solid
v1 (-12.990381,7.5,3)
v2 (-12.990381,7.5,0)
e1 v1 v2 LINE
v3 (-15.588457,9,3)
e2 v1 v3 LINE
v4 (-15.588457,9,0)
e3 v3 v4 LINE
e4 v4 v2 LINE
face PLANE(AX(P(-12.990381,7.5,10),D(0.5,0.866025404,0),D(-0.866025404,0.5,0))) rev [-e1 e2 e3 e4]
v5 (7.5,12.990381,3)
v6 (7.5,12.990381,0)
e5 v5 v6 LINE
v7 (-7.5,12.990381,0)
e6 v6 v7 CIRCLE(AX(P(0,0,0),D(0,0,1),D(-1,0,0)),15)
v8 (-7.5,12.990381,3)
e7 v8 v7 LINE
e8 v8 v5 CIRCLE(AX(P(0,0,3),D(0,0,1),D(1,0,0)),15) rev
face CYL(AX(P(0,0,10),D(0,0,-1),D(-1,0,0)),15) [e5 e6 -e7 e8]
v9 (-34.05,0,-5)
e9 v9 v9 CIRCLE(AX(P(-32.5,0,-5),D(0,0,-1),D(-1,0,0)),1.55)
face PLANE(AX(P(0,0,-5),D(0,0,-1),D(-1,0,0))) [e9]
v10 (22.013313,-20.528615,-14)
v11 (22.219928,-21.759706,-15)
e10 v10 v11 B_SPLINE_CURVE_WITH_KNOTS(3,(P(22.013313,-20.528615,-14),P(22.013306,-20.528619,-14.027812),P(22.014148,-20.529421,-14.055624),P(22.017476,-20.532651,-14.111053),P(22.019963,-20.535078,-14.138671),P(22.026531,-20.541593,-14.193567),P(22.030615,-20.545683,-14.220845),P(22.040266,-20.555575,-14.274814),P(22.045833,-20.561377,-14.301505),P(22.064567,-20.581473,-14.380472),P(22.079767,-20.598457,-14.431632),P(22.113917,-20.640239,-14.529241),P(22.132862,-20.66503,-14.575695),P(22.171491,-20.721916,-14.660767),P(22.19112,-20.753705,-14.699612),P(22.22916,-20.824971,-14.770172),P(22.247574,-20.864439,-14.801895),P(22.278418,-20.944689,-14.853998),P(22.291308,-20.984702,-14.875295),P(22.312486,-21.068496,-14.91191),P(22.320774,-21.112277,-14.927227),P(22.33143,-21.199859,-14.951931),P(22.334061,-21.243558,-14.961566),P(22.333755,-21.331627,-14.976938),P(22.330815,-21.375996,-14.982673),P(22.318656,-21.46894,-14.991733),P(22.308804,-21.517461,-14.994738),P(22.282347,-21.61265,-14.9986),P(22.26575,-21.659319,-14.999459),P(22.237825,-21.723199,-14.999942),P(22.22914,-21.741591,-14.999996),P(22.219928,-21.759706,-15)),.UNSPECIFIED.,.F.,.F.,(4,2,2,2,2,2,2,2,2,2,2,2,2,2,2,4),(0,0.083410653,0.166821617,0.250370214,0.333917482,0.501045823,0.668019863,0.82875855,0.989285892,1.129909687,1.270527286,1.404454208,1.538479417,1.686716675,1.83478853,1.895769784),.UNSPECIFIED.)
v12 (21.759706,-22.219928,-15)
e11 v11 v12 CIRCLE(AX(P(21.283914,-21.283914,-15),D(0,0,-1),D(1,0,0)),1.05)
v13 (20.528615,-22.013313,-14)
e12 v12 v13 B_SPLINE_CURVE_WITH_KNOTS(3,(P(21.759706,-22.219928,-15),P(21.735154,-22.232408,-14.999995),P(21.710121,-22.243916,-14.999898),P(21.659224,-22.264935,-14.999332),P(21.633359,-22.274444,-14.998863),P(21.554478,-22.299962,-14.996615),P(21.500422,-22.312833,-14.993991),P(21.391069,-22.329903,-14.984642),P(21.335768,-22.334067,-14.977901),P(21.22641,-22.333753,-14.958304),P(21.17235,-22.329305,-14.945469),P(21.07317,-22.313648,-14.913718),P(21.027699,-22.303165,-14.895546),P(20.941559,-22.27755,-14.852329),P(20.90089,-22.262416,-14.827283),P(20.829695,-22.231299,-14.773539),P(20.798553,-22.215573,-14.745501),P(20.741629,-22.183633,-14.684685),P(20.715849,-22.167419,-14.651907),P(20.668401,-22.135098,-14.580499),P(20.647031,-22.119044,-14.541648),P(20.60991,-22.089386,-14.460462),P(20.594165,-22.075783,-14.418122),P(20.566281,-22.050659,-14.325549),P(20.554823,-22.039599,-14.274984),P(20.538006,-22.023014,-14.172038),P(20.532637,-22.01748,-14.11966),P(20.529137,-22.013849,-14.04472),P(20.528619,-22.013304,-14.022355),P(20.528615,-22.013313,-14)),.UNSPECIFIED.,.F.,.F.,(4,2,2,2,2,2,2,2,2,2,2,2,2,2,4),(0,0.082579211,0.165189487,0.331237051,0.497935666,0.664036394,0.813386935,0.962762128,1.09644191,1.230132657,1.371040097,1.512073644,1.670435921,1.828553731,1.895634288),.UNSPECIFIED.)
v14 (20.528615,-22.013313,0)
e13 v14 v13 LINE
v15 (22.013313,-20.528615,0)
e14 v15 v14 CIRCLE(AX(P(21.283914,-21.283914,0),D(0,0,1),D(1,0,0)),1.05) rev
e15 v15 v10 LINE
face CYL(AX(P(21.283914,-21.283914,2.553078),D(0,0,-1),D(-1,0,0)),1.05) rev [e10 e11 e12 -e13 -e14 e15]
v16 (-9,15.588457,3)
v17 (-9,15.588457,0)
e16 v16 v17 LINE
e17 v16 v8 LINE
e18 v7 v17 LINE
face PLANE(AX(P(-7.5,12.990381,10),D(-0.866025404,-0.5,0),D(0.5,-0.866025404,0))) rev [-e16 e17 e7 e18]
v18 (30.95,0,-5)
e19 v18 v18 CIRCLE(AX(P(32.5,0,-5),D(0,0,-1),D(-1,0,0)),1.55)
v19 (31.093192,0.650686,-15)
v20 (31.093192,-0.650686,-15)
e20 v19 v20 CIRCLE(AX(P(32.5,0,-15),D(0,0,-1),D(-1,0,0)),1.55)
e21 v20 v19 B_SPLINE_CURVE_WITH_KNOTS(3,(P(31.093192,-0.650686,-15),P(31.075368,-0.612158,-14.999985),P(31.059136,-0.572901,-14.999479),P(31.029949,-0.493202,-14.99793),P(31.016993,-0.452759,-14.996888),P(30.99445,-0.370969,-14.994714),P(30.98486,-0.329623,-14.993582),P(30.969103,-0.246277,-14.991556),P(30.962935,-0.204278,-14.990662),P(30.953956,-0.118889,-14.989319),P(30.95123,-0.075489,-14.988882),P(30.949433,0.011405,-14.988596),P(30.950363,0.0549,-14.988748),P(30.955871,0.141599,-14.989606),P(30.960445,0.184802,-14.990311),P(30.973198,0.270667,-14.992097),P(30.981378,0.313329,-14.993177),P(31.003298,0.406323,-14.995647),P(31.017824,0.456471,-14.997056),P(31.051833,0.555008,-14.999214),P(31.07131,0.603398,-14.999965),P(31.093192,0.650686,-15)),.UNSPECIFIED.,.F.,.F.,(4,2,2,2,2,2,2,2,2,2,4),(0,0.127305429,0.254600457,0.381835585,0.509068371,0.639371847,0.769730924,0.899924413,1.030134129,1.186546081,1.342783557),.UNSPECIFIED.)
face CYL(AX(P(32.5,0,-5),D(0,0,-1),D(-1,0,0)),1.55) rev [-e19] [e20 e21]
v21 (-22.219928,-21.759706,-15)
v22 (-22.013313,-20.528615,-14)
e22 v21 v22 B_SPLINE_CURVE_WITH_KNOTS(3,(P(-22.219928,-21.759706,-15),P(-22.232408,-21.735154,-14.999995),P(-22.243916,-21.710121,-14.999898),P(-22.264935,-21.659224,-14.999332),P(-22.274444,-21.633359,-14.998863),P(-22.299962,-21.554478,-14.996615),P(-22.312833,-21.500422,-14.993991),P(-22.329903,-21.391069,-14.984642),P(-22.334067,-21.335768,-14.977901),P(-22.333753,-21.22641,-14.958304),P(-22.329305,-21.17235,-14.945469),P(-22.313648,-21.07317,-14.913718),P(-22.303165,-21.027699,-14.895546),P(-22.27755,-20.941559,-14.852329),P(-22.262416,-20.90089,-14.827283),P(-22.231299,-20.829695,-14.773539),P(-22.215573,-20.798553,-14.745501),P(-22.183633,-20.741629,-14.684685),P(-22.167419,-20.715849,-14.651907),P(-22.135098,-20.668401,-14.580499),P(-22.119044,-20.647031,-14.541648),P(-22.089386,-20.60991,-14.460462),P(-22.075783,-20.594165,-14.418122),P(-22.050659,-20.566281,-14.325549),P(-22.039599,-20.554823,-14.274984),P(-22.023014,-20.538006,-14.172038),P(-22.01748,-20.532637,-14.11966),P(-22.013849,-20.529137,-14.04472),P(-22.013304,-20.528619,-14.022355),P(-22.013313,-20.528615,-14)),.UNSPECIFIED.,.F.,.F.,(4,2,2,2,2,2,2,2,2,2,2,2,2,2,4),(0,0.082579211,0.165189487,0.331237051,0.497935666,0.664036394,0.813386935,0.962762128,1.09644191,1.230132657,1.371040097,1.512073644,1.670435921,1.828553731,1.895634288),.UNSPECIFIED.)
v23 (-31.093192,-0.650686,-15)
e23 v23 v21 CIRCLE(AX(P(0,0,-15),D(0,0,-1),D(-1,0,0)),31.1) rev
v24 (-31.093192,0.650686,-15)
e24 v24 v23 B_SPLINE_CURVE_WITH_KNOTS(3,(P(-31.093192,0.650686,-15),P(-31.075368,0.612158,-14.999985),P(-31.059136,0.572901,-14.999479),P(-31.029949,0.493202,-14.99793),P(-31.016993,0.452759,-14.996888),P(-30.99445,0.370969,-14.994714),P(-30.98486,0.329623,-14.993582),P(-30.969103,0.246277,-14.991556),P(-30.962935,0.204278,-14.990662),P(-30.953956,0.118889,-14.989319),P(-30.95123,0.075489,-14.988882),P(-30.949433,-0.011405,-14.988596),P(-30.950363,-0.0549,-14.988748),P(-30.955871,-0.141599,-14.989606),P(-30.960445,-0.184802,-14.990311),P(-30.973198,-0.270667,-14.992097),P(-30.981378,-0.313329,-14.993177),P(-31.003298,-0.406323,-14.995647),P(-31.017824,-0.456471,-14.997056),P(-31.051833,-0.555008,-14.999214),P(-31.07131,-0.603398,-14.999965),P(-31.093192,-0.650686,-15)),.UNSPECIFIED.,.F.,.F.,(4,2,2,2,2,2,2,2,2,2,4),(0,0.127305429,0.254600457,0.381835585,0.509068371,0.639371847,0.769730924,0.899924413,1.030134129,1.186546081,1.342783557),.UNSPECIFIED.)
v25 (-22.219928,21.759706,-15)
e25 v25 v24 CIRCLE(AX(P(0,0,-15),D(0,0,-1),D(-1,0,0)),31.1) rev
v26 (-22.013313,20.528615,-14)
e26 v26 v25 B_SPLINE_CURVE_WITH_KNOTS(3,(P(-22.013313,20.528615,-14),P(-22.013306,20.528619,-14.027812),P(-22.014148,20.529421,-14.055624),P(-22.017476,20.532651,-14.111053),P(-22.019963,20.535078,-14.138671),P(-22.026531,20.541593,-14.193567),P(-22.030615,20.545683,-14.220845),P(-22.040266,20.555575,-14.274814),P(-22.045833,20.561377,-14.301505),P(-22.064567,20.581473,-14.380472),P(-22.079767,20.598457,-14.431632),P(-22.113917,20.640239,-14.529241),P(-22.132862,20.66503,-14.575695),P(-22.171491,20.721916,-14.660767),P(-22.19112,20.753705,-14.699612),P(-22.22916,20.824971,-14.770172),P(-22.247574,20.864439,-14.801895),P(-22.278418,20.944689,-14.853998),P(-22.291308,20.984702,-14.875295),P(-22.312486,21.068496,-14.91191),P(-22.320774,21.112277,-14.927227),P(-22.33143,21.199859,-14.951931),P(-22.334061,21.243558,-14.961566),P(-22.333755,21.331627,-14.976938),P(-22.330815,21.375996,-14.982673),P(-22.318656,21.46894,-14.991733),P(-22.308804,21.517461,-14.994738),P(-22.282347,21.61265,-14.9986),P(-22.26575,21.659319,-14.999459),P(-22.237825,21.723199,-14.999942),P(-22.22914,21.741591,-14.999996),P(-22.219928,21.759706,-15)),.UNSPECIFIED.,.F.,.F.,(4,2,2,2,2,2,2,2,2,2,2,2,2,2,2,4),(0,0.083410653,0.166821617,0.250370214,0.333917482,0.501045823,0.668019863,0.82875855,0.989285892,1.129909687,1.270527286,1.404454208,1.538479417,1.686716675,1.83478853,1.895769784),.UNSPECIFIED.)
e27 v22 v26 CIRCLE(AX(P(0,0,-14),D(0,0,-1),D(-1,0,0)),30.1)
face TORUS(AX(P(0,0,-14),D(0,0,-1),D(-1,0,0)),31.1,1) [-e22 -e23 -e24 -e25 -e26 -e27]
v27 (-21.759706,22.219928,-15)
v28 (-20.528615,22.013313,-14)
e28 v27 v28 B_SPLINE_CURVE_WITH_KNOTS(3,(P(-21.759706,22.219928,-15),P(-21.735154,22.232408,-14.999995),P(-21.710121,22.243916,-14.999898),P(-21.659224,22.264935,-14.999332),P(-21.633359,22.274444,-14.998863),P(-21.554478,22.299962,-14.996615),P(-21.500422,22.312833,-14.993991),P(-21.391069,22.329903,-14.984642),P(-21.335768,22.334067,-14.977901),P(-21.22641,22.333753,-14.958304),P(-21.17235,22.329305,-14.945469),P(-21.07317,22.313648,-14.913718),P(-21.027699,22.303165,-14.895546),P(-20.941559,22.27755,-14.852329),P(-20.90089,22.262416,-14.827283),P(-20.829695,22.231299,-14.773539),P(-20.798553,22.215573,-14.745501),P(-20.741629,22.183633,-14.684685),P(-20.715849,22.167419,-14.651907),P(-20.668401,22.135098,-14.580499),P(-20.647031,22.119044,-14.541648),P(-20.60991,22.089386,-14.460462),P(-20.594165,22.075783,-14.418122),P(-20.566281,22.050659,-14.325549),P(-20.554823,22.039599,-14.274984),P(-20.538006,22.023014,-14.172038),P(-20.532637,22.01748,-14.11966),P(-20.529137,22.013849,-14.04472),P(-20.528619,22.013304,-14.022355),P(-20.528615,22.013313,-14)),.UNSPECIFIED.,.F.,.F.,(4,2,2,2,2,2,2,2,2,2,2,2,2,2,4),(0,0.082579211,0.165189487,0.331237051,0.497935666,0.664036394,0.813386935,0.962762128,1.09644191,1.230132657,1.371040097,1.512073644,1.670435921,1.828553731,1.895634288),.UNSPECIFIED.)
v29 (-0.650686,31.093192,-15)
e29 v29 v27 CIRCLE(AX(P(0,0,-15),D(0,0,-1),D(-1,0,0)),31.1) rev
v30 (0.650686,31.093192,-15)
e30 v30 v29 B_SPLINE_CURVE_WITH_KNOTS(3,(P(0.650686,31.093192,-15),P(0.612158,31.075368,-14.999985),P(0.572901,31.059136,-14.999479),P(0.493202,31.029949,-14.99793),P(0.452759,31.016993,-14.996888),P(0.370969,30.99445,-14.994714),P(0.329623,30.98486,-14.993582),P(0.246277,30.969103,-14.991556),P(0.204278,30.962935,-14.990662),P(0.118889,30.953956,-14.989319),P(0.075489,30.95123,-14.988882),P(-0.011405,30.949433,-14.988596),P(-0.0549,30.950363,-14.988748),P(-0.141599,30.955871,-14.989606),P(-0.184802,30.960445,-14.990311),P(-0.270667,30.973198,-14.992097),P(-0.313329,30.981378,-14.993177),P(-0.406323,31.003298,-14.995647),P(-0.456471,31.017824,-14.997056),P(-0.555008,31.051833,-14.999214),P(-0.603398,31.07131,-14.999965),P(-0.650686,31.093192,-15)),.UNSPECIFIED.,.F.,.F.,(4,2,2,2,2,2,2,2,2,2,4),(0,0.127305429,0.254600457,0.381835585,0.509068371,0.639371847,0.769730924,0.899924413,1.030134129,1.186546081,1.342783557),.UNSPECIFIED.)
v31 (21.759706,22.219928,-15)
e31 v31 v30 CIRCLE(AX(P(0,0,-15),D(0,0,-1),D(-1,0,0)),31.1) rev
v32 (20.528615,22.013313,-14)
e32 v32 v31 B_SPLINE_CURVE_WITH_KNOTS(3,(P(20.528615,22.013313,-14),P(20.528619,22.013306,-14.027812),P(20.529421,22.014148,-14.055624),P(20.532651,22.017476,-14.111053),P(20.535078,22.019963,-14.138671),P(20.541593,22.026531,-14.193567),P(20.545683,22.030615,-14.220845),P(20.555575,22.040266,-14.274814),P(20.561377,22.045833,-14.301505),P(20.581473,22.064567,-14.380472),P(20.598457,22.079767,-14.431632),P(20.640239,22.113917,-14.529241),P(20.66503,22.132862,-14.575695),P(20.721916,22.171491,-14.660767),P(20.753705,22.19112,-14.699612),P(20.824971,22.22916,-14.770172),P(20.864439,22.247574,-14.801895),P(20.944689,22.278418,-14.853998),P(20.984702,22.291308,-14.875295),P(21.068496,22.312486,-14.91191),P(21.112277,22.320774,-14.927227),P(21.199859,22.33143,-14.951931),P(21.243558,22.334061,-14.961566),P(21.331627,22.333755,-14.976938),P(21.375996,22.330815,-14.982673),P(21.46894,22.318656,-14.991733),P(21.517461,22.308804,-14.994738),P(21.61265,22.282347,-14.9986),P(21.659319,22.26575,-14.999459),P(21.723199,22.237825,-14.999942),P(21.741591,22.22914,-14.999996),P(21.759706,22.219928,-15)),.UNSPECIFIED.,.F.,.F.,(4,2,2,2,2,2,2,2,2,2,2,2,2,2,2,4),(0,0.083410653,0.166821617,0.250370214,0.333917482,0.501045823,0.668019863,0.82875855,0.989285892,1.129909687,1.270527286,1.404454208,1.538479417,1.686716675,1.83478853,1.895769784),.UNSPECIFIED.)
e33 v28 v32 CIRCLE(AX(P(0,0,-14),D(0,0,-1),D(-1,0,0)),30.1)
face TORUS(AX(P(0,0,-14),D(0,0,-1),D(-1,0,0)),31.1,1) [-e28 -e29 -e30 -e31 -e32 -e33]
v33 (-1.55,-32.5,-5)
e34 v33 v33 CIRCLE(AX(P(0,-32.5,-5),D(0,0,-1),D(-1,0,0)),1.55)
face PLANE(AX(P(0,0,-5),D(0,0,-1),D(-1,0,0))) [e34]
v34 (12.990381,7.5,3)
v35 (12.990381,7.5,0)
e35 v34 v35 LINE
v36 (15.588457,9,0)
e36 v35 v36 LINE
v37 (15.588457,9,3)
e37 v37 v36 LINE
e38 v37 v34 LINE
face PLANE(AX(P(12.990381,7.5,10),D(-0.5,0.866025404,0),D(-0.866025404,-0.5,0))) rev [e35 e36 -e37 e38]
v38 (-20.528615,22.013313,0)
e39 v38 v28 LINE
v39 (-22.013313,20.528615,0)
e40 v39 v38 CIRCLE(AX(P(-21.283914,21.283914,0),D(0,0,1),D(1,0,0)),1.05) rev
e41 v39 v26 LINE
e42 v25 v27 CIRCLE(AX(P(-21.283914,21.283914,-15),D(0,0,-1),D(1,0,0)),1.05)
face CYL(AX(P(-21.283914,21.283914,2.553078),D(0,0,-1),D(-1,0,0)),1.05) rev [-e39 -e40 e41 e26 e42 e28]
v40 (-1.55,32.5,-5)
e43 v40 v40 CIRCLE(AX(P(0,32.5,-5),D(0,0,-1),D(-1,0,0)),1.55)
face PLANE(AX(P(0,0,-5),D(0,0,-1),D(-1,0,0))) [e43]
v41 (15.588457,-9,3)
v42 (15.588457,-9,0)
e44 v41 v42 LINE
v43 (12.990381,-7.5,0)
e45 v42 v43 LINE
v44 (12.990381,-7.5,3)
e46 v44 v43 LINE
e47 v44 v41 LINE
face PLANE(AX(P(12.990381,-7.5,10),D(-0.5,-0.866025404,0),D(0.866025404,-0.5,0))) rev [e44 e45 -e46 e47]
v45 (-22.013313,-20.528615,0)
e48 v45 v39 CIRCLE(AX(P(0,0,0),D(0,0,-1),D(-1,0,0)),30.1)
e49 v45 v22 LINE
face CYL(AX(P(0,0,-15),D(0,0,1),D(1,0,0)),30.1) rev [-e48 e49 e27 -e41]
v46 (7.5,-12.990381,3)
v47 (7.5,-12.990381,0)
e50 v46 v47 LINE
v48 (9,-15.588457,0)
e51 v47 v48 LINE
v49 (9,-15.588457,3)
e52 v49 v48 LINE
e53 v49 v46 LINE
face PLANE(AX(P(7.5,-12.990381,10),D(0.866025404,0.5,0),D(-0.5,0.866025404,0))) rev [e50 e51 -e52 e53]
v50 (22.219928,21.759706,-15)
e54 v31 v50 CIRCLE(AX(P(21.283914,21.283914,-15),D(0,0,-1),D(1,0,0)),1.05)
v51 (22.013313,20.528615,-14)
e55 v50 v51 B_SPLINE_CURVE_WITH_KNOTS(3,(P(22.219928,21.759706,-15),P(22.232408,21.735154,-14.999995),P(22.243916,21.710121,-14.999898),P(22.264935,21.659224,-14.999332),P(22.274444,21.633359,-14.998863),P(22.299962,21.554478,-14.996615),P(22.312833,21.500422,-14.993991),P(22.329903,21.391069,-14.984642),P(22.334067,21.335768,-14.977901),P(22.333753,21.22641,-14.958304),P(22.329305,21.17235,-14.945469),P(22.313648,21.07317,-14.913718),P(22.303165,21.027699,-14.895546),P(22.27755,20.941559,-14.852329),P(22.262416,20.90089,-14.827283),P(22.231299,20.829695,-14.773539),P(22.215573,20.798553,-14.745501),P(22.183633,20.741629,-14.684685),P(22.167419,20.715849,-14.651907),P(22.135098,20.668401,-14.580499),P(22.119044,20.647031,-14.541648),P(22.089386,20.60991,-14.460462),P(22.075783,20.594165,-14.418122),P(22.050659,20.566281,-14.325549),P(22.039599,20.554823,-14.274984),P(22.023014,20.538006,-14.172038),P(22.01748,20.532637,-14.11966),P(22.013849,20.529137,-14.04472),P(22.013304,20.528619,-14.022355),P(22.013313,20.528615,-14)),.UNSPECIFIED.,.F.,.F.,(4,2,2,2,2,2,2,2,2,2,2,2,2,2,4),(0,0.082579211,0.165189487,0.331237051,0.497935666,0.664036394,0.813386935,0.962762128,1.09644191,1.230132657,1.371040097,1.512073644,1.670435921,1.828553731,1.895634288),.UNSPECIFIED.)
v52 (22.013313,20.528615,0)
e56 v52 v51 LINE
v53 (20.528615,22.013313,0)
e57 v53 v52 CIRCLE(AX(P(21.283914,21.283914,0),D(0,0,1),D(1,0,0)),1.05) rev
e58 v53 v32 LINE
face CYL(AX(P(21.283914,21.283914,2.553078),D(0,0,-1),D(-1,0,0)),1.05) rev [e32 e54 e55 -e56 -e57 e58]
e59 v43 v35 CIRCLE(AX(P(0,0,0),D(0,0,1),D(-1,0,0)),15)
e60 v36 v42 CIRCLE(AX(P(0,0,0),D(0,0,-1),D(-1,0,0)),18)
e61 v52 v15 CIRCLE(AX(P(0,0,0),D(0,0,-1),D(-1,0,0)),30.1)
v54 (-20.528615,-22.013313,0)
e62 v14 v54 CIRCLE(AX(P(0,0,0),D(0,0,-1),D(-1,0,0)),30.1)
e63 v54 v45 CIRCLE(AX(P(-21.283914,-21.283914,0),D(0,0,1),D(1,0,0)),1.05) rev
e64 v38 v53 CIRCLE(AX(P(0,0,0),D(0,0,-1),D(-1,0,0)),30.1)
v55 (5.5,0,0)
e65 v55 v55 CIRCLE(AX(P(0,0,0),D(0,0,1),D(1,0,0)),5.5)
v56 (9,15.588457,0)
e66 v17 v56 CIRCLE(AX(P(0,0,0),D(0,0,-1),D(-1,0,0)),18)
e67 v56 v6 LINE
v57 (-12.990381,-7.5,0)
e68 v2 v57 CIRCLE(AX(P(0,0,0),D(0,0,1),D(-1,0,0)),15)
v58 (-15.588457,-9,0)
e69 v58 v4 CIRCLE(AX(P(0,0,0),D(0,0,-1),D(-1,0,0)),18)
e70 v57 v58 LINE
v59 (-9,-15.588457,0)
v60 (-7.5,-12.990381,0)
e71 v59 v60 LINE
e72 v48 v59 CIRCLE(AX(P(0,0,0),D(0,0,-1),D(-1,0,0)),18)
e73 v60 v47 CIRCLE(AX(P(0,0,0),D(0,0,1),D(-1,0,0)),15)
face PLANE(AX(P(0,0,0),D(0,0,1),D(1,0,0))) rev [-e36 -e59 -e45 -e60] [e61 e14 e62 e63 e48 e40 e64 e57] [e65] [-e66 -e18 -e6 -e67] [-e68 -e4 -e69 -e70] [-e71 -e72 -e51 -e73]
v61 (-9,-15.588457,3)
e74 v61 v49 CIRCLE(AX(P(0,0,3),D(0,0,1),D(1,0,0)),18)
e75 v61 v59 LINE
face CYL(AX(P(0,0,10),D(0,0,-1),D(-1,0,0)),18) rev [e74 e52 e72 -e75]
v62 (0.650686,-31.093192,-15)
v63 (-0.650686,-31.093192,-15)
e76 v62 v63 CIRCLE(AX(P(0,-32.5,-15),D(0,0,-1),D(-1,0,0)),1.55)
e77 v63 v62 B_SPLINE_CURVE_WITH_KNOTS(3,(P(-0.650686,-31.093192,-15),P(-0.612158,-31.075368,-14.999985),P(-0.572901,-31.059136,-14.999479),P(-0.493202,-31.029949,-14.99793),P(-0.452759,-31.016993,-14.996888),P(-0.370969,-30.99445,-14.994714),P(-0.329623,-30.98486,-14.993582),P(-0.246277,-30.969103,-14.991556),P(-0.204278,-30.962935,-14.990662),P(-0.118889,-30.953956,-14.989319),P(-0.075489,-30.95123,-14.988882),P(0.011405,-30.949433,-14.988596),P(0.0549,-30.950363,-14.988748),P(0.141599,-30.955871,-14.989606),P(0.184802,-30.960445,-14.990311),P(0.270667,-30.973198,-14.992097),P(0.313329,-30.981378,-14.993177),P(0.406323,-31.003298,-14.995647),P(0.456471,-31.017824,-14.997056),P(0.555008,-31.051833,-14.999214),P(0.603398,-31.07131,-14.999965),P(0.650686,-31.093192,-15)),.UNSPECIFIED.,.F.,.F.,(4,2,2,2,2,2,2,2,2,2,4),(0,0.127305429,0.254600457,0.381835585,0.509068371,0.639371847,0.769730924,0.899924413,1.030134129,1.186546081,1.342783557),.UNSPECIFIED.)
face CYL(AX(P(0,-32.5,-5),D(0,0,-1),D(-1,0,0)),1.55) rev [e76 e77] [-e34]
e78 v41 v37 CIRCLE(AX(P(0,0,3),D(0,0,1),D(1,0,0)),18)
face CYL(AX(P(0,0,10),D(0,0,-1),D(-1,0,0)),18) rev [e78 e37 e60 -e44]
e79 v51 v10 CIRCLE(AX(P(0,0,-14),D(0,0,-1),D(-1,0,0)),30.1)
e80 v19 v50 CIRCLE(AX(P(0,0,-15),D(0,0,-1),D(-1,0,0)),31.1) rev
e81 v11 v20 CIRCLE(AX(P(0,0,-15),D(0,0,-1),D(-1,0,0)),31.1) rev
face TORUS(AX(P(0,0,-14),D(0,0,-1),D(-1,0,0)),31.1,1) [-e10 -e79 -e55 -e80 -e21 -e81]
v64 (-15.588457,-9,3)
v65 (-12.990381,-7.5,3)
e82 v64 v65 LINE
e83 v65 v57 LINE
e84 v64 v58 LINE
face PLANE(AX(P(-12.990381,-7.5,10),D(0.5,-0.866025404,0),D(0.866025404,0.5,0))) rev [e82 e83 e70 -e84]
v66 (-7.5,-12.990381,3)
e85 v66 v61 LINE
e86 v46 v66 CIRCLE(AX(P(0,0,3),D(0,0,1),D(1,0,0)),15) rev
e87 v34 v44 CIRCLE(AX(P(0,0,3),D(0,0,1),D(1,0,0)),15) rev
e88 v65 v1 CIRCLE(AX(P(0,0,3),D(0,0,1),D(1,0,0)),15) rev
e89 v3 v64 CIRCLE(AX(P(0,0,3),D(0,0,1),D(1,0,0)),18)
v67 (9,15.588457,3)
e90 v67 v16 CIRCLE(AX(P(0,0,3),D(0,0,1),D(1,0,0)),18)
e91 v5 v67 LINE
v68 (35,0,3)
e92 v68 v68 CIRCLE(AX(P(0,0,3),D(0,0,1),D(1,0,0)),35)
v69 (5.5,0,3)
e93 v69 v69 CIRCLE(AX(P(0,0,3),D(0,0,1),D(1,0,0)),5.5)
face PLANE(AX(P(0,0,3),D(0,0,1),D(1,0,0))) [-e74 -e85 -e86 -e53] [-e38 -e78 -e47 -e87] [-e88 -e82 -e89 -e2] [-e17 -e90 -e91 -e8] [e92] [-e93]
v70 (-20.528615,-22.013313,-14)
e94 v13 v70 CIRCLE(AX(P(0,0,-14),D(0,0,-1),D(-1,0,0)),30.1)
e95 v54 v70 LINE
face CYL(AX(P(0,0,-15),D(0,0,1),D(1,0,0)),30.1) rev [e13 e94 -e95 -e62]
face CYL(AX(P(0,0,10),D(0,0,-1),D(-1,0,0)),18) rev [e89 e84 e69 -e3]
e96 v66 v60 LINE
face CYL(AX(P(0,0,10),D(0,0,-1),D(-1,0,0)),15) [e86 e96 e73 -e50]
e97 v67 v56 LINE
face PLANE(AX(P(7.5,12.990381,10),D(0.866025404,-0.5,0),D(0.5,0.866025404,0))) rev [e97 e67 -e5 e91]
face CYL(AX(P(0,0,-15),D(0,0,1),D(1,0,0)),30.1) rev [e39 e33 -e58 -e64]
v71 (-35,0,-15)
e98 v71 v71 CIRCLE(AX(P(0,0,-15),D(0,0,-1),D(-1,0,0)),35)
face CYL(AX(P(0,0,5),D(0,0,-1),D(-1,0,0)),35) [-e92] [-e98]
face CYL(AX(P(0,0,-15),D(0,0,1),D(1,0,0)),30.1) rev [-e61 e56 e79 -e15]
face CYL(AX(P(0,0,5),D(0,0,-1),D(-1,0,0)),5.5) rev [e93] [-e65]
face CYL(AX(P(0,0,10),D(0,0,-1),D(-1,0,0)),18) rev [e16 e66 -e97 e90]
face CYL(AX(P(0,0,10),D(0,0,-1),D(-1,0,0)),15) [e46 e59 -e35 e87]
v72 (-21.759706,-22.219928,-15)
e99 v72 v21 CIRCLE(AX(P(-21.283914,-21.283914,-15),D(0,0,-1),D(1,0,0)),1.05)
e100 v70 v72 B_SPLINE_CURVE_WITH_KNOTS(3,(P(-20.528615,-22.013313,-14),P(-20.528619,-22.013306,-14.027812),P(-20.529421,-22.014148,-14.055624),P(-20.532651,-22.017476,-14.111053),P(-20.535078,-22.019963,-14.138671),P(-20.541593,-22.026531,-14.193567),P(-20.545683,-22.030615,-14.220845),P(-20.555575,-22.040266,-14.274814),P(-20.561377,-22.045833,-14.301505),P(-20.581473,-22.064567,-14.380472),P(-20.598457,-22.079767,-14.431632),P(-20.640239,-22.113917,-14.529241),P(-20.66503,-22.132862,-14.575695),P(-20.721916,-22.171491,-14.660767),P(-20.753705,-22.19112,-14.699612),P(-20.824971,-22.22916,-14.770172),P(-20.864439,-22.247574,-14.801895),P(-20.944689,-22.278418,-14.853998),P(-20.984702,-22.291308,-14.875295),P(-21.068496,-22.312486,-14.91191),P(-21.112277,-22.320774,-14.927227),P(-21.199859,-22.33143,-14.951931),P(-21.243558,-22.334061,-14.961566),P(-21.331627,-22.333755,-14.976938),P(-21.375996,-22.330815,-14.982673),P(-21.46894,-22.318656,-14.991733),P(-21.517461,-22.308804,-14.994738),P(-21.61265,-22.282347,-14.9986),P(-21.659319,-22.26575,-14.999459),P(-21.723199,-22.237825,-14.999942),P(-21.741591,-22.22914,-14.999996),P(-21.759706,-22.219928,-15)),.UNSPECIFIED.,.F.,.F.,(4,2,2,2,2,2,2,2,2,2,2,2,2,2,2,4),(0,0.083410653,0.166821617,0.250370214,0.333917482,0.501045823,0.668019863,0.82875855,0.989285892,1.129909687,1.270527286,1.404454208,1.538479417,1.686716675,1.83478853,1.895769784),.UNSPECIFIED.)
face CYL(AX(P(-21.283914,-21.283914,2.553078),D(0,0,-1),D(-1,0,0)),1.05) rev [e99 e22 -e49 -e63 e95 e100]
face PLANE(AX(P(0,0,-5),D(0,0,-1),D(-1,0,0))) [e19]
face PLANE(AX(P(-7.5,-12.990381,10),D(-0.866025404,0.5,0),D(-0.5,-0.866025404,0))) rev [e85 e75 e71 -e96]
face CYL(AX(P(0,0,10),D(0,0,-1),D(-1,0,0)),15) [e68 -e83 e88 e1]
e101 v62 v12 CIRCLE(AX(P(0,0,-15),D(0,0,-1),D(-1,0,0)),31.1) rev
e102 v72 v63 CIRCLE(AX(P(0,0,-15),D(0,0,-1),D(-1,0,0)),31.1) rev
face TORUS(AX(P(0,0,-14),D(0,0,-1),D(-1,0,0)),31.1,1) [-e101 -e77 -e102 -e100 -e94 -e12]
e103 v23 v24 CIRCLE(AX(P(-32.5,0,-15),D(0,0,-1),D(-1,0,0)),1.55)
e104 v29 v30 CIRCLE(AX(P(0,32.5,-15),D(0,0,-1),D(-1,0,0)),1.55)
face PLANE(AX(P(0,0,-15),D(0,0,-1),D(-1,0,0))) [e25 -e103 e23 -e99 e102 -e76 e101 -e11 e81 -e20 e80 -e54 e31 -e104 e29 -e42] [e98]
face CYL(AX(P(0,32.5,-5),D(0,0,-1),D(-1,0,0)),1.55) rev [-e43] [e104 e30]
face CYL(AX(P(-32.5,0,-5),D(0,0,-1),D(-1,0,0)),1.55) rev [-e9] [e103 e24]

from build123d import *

# Parameters (mm, degrees)
SKETCH_2_R          = 35
SKETCH_2_R_2        = 5.5
EXTRUDE_1_DEPTH     = 5
EXTRUDE_START       = 15
SKETCH_3_R          = 35
SKETCH_3_R_2        = 30.1
EXTRUDE_2_DEPTH     = 15
SKETCH_4_R          = 1.55
CUT_EXTRUDE_1_DEPTH = 10
CUT_EXTRUDE_5_DEPTH = 15
FILLET_1_R          = 1
CUT_EXTRUDE_START   = -2
SKETCH_10_R         = 35
CUT_EXTRUDE_6_DEPTH = 2
CUT_EXTRUDE_7_DEPTH = 10


with BuildPart() as part:
    # 草图2 → 凸台-拉伸1 (new body)
    with BuildSketch(Plane.XY):
        Circle(SKETCH_2_R)
        Circle(SKETCH_2_R_2, mode=Mode.SUBTRACT)
    extrude(amount=EXTRUDE_1_DEPTH)

    # 草图3 → 凸台-拉伸2 (add)
    with BuildSketch(Plane(origin=(0, 0, 0), x_dir=(-1, 0, 0), z_dir=(0, 0, -1)).offset(EXTRUDE_START)):
        Circle(SKETCH_3_R)
        Circle(SKETCH_3_R_2, mode=Mode.SUBTRACT)
    extrude(amount=-EXTRUDE_2_DEPTH)

    # 草图4 → 切除-拉伸1 (cut)
    with BuildSketch(Plane(origin=(0, 0, -15), x_dir=(-1, 0, 0), z_dir=(0, 0, -1))):
        with Locations((0, 32.5)):
            Circle(SKETCH_4_R)
        with Locations((32.5, 0)):
            Circle(SKETCH_4_R)
        with Locations((0, -32.5)):
            Circle(SKETCH_4_R)
        with Locations((-32.5, 0)):
            Circle(SKETCH_4_R)
    extrude(amount=-CUT_EXTRUDE_1_DEPTH, mode=Mode.SUBTRACT)

    # 草图9 → 切除-拉伸5 (cut)
    with BuildSketch(Plane(origin=(0, 0, -15), x_dir=(-1, 0, 0), z_dir=(0, 0, -1))):
        with BuildLine():
            ThreePointArc((-22.013313369, 20.528615017), (-22.026376234, 22.026376234), (-20.528615017, 22.013313369))
            ThreePointArc((-20.528615017, 22.013313369), (-21.283914114, 21.283914114), (-22.013313369, 20.528615017))
        make_face()
        with BuildLine():
            ThreePointArc((20.528615017, 22.013313369), (22.026376234, 22.026376234), (22.013313369, 20.528615017))
            ThreePointArc((22.013313369, 20.528615017), (21.283914114, 21.283914114), (20.528615017, 22.013313369))
        make_face()
        with BuildLine():
            ThreePointArc((22.013313369, -20.528615017), (22.026376234, -22.026376234), (20.528615017, -22.013313369))
            ThreePointArc((20.528615017, -22.013313369), (21.283914114, -21.283914114), (22.013313369, -20.528615017))
        make_face()
        with BuildLine():
            ThreePointArc((-20.528615017, -22.013313369), (-22.026376234, -22.026376234), (-22.013313369, -20.528615017))
            ThreePointArc((-22.013313369, -20.528615017), (-21.283914114, -21.283914114), (-20.528615017, -22.013313369))
        make_face()
    extrude(amount=-CUT_EXTRUDE_5_DEPTH, mode=Mode.SUBTRACT)

    # 圆角1
    # the kernel refuses this fillet: 1 mm, written as the material it takes off along each edge
    with BuildSketch(Plane(origin=(0, 0, -15), x_dir=(-0.7403558797037455, 0.6722151228498904, 0), z_dir=(-0.6722151228498904, -0.7403558797037455, 0))) as fillet_1_piece_1:
        with BuildLine():
            CenterArc((30.1 + FILLET_1_R, -FILLET_1_R), FILLET_1_R, 90, 90)
            Line((30.1, -FILLET_1_R), (30.1, 0))
            Line((30.1, 0), (30.1 + FILLET_1_R, 0))
        make_face()
    revolve(axis=Axis((0, 0, -15), (0, 0, -1)), revolution_arc=95.523479776, mode=Mode.SUBTRACT)
    with BuildSketch(Plane(origin=(0, 0, -15), x_dir=(0.6722151228498918, 0.7403558797037441, 0), z_dir=(-0.7403558797037441, 0.6722151228498918, 0))) as fillet_1_piece_2:
        with BuildLine():
            CenterArc((30.1 + FILLET_1_R, -FILLET_1_R), FILLET_1_R, 90, 90)
            Line((30.1, -FILLET_1_R), (30.1, 0))
            Line((30.1, 0), (30.1 + FILLET_1_R, 0))
        make_face()
    revolve(axis=Axis((0, 0, -15), (0, 0, -1)), revolution_arc=95.523479776, mode=Mode.SUBTRACT)
    with BuildSketch(Plane(origin=(0, 0, -15), x_dir=(0.7403558797037453, -0.6722151228498905, 0), z_dir=(0.6722151228498905, 0.7403558797037453, 0))) as fillet_1_piece_3:
        with BuildLine():
            CenterArc((30.1 + FILLET_1_R, -FILLET_1_R), FILLET_1_R, 90, 90)
            Line((30.1, -FILLET_1_R), (30.1, 0))
            Line((30.1, 0), (30.1 + FILLET_1_R, 0))
        make_face()
    revolve(axis=Axis((0, 0, -15), (0, 0, -1)), revolution_arc=95.523479776, mode=Mode.SUBTRACT)
    with BuildSketch(Plane(origin=(0, 0, -15), x_dir=(-1, 0, 0), z_dir=(0, -1, 0))) as fillet_1_piece_4:
        with BuildLine():
            CenterArc((30.1 + FILLET_1_R, -FILLET_1_R), FILLET_1_R, 90, 90)
            Line((30.1, -FILLET_1_R), (30.1, 0))
            Line((30.1, 0), (30.1 + FILLET_1_R, 0))
        make_face()
    revolve(axis=Axis((0, 0, -15), (0, 0, -1)), revolution_arc=47.760430641, mode=Mode.SUBTRACT)
    with BuildSketch(Plane(origin=(0, 0, -15), x_dir=(-0.6722320403041436, -0.7403405189428228, 0), z_dir=(0.7403405189428228, -0.6722320403041436, 0))) as fillet_1_piece_5:
        with BuildLine():
            CenterArc((30.1 + FILLET_1_R, -FILLET_1_R), FILLET_1_R, 90, 90)
            Line((30.1, -FILLET_1_R), (30.1, 0))
            Line((30.1, 0), (30.1 + FILLET_1_R, 0))
        make_face()
    revolve(axis=Axis((0, 0, -15), (0, 0, -1)), revolution_arc=47.760430641, mode=Mode.SUBTRACT)

    # 草图10 → 切除-拉伸6 (cut)
    with BuildSketch(Plane.XY.offset(5).offset(CUT_EXTRUDE_START)):
        with Locations(Location((0, 0, 0), (0, 0, 180))):
            Circle(SKETCH_10_R)
    extrude(amount=CUT_EXTRUDE_6_DEPTH, mode=Mode.SUBTRACT)

    # 草图11 → 切除-拉伸7 (cut)
    with BuildSketch(Plane(origin=(0, 0, 0), x_dir=(-1, 0, 0), z_dir=(0, 0, -1))):
        with BuildLine():
            Line((12.990381057, 7.5), (15.588457268, 9))
            ThreePointArc((15.588457268, 9), (18, 0), (15.588457268, -9))
            Line((15.588457268, -9), (12.990381057, -7.5))
            ThreePointArc((12.990381057, -7.5), (15, 0), (12.990381057, 7.5))
        make_face()
        with BuildLine():
            Line((-7.5, 12.990381057), (-9, 15.588457268))
            ThreePointArc((-9, 15.588457268), (0, 18), (9, 15.588457268))
            Line((9, 15.588457268), (7.5, 12.990381057))
            ThreePointArc((7.5, 12.990381057), (0, 15), (-7.5, 12.990381057))
        make_face()
        with BuildLine():
            Line((7.5, -12.990381057), (9, -15.588457268))
            ThreePointArc((9, -15.588457268), (0, -18), (-9, -15.588457268))
            Line((-9, -15.588457268), (-7.5, -12.990381057))
            ThreePointArc((-7.5, -12.990381057), (0, -15), (7.5, -12.990381057))
        make_face()
        with BuildLine():
            Line((-12.990381057, -7.5), (-15.588457268, -9))
            ThreePointArc((-15.588457268, -9), (-18, 0), (-15.588457268, 9))
            Line((-15.588457268, 9), (-12.990381057, 7.5))
            ThreePointArc((-12.990381057, 7.5), (-15, 0), (-12.990381057, -7.5))
        make_face()
    extrude(amount=-CUT_EXTRUDE_7_DEPTH, mode=Mode.SUBTRACT)


solid = part.part
